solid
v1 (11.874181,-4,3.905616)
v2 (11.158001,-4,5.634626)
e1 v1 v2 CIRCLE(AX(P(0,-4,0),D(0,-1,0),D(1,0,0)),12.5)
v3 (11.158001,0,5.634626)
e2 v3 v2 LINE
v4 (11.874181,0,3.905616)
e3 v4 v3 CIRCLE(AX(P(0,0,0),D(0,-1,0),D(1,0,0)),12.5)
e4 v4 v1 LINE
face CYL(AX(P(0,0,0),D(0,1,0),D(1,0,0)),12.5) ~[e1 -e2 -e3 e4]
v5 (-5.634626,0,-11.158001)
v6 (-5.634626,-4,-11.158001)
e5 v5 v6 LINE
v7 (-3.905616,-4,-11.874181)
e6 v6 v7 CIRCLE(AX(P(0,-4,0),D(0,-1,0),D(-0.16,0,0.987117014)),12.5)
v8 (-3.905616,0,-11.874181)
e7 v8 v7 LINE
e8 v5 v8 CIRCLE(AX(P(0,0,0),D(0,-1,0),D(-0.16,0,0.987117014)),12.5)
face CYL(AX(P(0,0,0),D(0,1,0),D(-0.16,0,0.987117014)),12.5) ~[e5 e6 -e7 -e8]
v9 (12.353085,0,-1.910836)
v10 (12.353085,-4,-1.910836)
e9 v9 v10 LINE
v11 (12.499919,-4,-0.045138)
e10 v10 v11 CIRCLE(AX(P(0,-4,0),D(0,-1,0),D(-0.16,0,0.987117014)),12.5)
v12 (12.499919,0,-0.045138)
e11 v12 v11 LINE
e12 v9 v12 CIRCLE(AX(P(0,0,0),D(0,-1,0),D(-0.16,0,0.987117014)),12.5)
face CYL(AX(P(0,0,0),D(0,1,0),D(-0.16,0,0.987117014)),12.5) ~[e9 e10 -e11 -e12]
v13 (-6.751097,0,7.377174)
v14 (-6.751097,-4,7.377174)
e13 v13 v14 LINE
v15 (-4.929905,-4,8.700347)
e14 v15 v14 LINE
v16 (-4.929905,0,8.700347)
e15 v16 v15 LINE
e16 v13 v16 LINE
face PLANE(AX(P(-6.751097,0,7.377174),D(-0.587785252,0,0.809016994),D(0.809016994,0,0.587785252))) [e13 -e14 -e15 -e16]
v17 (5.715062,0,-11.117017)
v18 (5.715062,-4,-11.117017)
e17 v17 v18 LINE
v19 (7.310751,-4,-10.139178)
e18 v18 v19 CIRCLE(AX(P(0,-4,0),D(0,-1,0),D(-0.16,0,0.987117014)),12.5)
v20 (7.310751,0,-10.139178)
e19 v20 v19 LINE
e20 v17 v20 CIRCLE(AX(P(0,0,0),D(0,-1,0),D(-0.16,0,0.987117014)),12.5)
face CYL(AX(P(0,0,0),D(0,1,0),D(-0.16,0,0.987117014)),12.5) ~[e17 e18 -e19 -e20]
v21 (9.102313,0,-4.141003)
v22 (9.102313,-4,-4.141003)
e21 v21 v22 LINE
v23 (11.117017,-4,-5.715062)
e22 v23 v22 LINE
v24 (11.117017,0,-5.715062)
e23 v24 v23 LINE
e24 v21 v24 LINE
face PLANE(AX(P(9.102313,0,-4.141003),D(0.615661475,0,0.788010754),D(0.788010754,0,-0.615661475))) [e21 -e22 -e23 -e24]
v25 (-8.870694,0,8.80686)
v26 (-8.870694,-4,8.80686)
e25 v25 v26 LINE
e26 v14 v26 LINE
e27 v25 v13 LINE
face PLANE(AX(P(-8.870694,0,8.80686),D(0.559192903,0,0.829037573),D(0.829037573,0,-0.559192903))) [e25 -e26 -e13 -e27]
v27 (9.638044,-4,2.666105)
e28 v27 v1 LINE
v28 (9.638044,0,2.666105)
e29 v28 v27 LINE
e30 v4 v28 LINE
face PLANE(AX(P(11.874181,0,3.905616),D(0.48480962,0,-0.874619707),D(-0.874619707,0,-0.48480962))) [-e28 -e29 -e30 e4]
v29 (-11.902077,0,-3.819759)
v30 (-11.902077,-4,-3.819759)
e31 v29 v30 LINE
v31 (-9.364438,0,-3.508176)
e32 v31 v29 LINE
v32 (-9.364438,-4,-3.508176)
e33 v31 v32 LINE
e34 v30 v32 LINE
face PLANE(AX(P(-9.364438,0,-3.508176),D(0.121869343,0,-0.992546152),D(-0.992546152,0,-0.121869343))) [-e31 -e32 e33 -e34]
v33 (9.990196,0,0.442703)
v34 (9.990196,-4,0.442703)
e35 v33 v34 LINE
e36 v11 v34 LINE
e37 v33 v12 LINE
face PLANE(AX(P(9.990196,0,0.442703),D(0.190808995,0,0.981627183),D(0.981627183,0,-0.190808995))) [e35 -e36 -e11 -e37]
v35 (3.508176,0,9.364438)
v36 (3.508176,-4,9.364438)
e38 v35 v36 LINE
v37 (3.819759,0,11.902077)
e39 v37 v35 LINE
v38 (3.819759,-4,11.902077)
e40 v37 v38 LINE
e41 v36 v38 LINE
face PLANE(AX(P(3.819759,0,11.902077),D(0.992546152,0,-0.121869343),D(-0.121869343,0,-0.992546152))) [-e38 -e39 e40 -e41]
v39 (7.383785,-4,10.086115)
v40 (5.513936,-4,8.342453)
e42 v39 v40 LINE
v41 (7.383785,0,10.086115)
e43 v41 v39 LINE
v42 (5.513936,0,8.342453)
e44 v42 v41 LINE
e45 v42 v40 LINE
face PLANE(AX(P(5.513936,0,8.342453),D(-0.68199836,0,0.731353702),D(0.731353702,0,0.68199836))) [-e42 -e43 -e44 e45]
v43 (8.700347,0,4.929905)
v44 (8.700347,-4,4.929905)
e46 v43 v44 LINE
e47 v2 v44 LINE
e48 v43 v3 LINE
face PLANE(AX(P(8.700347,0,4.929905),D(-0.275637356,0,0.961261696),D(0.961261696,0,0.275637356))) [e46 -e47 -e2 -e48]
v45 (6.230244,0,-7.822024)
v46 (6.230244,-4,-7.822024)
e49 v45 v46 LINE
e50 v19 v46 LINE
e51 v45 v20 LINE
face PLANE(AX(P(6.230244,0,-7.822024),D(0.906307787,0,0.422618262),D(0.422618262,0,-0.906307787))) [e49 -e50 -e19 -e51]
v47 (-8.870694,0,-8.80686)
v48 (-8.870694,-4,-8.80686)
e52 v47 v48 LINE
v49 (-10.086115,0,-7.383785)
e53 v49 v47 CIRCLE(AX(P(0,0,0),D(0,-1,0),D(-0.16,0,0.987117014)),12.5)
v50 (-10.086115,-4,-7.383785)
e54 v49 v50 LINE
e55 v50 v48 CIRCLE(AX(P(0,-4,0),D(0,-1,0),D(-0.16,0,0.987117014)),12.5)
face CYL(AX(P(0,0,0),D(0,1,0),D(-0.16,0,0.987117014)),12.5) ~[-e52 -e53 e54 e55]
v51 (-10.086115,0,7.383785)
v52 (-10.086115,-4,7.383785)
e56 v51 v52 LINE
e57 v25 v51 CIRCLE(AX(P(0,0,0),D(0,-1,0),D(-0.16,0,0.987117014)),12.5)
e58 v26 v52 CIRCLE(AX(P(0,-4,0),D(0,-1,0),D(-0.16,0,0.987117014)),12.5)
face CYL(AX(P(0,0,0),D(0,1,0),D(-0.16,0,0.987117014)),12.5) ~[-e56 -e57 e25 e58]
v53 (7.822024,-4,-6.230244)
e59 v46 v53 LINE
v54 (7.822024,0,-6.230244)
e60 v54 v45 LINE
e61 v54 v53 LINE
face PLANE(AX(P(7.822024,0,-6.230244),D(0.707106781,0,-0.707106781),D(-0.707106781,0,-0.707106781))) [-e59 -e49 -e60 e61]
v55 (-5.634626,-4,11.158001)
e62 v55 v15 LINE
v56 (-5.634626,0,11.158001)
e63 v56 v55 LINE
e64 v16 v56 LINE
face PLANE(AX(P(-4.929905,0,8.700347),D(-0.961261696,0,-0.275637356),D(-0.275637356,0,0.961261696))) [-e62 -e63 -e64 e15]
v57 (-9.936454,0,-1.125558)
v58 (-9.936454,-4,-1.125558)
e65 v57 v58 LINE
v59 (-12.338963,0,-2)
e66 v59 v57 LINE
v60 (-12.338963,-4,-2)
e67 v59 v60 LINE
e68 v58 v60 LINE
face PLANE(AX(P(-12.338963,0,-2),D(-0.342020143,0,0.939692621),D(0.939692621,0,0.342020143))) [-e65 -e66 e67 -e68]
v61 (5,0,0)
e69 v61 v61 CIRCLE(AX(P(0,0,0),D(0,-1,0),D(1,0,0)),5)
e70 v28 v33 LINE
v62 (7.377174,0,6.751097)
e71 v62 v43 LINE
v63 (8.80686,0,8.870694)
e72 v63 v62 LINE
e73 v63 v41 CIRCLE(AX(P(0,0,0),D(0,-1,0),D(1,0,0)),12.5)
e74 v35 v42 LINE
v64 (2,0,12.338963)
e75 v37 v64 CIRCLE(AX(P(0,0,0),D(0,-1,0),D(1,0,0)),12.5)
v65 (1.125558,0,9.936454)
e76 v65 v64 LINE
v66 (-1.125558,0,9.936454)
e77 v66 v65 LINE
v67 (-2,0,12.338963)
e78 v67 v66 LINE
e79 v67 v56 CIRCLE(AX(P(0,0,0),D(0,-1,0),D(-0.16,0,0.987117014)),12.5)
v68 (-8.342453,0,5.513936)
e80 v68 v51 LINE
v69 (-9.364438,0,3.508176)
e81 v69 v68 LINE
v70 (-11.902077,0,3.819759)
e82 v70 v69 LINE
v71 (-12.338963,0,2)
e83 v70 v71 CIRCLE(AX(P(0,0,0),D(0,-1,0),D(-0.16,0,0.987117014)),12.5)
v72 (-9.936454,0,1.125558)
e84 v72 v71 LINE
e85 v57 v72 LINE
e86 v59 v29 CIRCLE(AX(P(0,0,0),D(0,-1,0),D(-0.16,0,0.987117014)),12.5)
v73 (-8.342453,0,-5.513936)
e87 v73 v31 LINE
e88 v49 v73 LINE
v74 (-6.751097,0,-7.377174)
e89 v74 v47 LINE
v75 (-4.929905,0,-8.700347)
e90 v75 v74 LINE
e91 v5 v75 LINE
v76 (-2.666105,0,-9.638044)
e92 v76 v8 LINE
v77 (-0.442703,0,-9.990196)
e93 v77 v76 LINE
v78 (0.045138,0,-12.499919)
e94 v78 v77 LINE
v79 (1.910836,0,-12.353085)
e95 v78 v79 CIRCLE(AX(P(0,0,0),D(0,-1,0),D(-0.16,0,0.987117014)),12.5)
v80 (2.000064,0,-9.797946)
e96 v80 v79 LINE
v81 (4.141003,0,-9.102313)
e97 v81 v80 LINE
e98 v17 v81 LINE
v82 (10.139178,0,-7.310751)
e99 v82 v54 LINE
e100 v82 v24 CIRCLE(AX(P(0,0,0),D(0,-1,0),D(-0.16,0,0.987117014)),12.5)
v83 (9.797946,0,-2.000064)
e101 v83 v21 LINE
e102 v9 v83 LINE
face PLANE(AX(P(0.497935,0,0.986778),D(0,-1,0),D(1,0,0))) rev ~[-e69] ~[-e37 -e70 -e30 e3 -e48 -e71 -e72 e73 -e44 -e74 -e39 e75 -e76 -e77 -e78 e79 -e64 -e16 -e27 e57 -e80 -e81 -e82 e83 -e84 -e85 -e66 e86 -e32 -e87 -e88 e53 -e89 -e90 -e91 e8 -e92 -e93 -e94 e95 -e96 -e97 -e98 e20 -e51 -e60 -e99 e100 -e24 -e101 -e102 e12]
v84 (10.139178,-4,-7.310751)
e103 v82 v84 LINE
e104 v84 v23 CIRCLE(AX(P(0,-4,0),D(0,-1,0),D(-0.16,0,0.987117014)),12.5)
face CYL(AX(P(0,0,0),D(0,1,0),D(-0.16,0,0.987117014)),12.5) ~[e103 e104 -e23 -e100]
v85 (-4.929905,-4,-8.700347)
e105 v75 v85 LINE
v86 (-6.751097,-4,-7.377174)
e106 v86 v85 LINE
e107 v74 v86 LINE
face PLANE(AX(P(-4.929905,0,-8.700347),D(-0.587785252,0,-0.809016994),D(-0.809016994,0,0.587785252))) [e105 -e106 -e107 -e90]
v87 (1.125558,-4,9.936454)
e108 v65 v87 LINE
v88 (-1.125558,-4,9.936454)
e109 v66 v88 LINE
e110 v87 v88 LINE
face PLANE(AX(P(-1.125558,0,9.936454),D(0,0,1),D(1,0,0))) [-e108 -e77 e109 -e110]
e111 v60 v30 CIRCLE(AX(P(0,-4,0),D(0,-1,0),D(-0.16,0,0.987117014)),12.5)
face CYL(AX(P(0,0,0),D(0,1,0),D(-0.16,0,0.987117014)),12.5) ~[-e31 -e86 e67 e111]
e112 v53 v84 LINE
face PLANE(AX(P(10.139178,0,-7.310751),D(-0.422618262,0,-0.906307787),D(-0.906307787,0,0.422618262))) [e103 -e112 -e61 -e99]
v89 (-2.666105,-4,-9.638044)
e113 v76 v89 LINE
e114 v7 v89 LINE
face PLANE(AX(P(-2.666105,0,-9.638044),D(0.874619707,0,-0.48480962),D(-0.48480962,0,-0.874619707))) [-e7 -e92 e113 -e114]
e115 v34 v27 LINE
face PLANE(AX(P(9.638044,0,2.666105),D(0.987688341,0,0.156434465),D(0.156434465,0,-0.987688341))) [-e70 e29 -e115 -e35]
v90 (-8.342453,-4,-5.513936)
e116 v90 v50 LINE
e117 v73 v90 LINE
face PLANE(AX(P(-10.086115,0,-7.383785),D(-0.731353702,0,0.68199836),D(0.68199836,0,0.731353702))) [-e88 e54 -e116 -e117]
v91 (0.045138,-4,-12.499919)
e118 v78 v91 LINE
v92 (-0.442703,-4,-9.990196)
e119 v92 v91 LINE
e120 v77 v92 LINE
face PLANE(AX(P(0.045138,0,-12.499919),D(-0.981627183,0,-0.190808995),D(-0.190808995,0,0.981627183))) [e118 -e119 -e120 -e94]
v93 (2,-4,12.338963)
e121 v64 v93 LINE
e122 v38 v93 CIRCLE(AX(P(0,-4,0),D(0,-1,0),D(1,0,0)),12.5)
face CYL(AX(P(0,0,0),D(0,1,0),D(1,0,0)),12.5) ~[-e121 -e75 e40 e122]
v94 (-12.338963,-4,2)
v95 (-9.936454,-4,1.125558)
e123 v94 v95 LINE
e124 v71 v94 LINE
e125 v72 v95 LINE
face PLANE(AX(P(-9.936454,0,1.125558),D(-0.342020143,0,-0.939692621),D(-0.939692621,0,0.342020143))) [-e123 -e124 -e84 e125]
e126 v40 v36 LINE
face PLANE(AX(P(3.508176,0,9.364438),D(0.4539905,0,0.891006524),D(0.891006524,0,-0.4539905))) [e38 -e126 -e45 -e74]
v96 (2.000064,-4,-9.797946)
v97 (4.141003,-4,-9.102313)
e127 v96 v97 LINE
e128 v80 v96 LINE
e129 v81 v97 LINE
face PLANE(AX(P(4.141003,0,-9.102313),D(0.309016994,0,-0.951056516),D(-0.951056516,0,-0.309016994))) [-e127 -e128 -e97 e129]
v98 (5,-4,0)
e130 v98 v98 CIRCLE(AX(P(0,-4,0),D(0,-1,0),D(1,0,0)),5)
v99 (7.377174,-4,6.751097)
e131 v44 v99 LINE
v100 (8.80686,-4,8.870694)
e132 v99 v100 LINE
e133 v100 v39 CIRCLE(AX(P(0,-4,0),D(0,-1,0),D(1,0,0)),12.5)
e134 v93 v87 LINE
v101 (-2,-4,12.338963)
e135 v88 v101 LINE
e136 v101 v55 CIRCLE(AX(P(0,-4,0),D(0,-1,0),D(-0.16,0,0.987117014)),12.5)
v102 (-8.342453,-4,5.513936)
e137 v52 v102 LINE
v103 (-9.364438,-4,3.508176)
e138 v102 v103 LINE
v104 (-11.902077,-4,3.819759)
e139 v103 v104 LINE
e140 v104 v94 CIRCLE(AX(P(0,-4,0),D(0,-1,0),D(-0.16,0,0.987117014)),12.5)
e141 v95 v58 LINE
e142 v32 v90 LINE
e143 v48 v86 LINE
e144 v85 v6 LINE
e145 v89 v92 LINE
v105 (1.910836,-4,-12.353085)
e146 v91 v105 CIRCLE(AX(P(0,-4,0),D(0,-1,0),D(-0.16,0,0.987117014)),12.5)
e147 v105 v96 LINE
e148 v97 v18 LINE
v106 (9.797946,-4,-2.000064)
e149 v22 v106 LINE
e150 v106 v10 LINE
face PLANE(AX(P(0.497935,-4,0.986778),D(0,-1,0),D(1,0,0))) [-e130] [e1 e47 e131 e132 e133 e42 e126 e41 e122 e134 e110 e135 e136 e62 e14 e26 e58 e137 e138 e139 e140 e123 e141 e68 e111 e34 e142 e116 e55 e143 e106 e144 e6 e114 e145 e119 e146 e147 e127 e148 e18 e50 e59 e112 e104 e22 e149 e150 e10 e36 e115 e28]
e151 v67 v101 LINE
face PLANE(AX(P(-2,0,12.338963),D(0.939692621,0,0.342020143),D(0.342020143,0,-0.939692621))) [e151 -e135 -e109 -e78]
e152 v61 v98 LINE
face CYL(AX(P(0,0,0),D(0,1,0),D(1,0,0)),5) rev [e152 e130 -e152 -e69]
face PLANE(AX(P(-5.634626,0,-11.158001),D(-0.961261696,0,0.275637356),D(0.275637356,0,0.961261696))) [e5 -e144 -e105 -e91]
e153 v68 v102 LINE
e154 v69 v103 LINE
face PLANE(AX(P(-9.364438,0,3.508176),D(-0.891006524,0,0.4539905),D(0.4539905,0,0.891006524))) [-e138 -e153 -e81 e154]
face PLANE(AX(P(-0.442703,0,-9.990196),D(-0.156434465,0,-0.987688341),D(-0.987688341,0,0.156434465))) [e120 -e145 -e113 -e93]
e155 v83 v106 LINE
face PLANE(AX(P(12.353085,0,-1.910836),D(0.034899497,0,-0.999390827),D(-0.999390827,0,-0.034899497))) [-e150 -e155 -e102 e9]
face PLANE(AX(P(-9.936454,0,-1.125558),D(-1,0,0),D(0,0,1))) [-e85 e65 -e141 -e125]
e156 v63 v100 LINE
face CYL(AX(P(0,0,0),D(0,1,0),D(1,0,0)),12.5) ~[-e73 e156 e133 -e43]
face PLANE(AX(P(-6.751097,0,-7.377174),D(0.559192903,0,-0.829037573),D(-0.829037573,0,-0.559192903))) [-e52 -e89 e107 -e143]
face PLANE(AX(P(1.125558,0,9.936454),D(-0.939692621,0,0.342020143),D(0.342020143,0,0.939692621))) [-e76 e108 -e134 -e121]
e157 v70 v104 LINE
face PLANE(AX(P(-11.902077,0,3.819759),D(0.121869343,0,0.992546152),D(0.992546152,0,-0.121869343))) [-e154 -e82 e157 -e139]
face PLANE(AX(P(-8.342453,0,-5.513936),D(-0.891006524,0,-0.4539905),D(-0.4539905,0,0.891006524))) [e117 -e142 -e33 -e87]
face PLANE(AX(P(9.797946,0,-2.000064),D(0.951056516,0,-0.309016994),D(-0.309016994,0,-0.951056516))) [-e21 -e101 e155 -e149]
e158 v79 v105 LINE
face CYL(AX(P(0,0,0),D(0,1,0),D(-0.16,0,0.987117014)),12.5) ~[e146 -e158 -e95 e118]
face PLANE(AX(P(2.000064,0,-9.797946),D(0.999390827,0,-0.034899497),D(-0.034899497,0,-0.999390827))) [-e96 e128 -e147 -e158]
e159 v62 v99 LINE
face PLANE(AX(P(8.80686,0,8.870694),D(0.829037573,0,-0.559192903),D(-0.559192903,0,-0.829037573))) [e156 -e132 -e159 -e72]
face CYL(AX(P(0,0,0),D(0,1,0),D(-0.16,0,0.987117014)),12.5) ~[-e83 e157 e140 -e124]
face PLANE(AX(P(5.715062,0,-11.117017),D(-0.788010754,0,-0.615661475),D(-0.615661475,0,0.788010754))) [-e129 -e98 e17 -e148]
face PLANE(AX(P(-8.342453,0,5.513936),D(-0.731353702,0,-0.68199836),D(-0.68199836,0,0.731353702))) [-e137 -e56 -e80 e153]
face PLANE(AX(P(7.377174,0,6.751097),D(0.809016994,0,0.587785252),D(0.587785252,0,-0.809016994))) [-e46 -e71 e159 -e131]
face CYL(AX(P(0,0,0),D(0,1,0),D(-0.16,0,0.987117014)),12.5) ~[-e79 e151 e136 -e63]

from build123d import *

# Parameters (mm, degrees)
F3_R            = 5
F4_DEPTH        = 4
F5_DEPTH        = 8
F5_COPIES_COUNT = 13
F5_COPIES_ANGLE = 324


# Not quite as in the source:
# - a feature of the source that left no trace in its solid (it failed there, or was rolled back) is left out
# - a pattern or mirror of a feature is missing from the dataset's text; its kind, count and spacing are read off the source's solid


with BuildPart() as f4:
    # F3 (on Front) → F4 (new body)
    with BuildSketch(Plane.XZ):
        with BuildLine():
            ThreePointArc((-2, 12.3389626793), (-8.100925873, -9.5197163823), (12.5, 0))
            ThreePointArc((12.5, 0), (9.5197163823, 8.100925873), (2, 12.3389626793))
            Line((2, 12.3389626793), (1.1255583585, 9.9364540145))
            Line((1.1255583585, 9.9364540145), (-1.1255583585, 9.9364540145))
            Line((-1.1255583585, 9.9364540145), (-2, 12.3389626793))
        make_face()
        Circle(F3_R, mode=Mode.SUBTRACT)
        with BuildLine():
            Line((1.1255583585, 9.9364540145), (2, 12.3389626793))
            ThreePointArc((2, 12.3389626793), (0, 12.5), (-2, 12.3389626793))
            Line((-2, 12.3389626793), (-1.1255583585, 9.9364540145))
            Line((-1.1255583585, 9.9364540145), (1.1255583585, 9.9364540145))
        make_face()
    extrude(amount=F4_DEPTH)

    # F3 (on Front) → F5 (cut)
    with BuildSketch(Plane.XZ):
        with BuildLine():
            Line((1.1255583585, 9.9364540145), (2, 12.3389626793))
            ThreePointArc((2, 12.3389626793), (0, 12.5), (-2, 12.3389626793))
            Line((-2, 12.3389626793), (-1.1255583585, 9.9364540145))
            Line((-1.1255583585, 9.9364540145), (1.1255583585, 9.9364540145))
        make_face()
    f5 = extrude(amount=F5_DEPTH, mode=Mode.SUBTRACT)

    # F5_copies: F5 ×13 about axis
    f5_copies_axis = Axis((0, 0, 0), (0, 1, 0))
    for i in range(1, F5_COPIES_COUNT):
        add(f5.rotate(f5_copies_axis, i * F5_COPIES_ANGLE / (F5_COPIES_COUNT - 1)), mode=Mode.SUBTRACT)


solid = f4.part
